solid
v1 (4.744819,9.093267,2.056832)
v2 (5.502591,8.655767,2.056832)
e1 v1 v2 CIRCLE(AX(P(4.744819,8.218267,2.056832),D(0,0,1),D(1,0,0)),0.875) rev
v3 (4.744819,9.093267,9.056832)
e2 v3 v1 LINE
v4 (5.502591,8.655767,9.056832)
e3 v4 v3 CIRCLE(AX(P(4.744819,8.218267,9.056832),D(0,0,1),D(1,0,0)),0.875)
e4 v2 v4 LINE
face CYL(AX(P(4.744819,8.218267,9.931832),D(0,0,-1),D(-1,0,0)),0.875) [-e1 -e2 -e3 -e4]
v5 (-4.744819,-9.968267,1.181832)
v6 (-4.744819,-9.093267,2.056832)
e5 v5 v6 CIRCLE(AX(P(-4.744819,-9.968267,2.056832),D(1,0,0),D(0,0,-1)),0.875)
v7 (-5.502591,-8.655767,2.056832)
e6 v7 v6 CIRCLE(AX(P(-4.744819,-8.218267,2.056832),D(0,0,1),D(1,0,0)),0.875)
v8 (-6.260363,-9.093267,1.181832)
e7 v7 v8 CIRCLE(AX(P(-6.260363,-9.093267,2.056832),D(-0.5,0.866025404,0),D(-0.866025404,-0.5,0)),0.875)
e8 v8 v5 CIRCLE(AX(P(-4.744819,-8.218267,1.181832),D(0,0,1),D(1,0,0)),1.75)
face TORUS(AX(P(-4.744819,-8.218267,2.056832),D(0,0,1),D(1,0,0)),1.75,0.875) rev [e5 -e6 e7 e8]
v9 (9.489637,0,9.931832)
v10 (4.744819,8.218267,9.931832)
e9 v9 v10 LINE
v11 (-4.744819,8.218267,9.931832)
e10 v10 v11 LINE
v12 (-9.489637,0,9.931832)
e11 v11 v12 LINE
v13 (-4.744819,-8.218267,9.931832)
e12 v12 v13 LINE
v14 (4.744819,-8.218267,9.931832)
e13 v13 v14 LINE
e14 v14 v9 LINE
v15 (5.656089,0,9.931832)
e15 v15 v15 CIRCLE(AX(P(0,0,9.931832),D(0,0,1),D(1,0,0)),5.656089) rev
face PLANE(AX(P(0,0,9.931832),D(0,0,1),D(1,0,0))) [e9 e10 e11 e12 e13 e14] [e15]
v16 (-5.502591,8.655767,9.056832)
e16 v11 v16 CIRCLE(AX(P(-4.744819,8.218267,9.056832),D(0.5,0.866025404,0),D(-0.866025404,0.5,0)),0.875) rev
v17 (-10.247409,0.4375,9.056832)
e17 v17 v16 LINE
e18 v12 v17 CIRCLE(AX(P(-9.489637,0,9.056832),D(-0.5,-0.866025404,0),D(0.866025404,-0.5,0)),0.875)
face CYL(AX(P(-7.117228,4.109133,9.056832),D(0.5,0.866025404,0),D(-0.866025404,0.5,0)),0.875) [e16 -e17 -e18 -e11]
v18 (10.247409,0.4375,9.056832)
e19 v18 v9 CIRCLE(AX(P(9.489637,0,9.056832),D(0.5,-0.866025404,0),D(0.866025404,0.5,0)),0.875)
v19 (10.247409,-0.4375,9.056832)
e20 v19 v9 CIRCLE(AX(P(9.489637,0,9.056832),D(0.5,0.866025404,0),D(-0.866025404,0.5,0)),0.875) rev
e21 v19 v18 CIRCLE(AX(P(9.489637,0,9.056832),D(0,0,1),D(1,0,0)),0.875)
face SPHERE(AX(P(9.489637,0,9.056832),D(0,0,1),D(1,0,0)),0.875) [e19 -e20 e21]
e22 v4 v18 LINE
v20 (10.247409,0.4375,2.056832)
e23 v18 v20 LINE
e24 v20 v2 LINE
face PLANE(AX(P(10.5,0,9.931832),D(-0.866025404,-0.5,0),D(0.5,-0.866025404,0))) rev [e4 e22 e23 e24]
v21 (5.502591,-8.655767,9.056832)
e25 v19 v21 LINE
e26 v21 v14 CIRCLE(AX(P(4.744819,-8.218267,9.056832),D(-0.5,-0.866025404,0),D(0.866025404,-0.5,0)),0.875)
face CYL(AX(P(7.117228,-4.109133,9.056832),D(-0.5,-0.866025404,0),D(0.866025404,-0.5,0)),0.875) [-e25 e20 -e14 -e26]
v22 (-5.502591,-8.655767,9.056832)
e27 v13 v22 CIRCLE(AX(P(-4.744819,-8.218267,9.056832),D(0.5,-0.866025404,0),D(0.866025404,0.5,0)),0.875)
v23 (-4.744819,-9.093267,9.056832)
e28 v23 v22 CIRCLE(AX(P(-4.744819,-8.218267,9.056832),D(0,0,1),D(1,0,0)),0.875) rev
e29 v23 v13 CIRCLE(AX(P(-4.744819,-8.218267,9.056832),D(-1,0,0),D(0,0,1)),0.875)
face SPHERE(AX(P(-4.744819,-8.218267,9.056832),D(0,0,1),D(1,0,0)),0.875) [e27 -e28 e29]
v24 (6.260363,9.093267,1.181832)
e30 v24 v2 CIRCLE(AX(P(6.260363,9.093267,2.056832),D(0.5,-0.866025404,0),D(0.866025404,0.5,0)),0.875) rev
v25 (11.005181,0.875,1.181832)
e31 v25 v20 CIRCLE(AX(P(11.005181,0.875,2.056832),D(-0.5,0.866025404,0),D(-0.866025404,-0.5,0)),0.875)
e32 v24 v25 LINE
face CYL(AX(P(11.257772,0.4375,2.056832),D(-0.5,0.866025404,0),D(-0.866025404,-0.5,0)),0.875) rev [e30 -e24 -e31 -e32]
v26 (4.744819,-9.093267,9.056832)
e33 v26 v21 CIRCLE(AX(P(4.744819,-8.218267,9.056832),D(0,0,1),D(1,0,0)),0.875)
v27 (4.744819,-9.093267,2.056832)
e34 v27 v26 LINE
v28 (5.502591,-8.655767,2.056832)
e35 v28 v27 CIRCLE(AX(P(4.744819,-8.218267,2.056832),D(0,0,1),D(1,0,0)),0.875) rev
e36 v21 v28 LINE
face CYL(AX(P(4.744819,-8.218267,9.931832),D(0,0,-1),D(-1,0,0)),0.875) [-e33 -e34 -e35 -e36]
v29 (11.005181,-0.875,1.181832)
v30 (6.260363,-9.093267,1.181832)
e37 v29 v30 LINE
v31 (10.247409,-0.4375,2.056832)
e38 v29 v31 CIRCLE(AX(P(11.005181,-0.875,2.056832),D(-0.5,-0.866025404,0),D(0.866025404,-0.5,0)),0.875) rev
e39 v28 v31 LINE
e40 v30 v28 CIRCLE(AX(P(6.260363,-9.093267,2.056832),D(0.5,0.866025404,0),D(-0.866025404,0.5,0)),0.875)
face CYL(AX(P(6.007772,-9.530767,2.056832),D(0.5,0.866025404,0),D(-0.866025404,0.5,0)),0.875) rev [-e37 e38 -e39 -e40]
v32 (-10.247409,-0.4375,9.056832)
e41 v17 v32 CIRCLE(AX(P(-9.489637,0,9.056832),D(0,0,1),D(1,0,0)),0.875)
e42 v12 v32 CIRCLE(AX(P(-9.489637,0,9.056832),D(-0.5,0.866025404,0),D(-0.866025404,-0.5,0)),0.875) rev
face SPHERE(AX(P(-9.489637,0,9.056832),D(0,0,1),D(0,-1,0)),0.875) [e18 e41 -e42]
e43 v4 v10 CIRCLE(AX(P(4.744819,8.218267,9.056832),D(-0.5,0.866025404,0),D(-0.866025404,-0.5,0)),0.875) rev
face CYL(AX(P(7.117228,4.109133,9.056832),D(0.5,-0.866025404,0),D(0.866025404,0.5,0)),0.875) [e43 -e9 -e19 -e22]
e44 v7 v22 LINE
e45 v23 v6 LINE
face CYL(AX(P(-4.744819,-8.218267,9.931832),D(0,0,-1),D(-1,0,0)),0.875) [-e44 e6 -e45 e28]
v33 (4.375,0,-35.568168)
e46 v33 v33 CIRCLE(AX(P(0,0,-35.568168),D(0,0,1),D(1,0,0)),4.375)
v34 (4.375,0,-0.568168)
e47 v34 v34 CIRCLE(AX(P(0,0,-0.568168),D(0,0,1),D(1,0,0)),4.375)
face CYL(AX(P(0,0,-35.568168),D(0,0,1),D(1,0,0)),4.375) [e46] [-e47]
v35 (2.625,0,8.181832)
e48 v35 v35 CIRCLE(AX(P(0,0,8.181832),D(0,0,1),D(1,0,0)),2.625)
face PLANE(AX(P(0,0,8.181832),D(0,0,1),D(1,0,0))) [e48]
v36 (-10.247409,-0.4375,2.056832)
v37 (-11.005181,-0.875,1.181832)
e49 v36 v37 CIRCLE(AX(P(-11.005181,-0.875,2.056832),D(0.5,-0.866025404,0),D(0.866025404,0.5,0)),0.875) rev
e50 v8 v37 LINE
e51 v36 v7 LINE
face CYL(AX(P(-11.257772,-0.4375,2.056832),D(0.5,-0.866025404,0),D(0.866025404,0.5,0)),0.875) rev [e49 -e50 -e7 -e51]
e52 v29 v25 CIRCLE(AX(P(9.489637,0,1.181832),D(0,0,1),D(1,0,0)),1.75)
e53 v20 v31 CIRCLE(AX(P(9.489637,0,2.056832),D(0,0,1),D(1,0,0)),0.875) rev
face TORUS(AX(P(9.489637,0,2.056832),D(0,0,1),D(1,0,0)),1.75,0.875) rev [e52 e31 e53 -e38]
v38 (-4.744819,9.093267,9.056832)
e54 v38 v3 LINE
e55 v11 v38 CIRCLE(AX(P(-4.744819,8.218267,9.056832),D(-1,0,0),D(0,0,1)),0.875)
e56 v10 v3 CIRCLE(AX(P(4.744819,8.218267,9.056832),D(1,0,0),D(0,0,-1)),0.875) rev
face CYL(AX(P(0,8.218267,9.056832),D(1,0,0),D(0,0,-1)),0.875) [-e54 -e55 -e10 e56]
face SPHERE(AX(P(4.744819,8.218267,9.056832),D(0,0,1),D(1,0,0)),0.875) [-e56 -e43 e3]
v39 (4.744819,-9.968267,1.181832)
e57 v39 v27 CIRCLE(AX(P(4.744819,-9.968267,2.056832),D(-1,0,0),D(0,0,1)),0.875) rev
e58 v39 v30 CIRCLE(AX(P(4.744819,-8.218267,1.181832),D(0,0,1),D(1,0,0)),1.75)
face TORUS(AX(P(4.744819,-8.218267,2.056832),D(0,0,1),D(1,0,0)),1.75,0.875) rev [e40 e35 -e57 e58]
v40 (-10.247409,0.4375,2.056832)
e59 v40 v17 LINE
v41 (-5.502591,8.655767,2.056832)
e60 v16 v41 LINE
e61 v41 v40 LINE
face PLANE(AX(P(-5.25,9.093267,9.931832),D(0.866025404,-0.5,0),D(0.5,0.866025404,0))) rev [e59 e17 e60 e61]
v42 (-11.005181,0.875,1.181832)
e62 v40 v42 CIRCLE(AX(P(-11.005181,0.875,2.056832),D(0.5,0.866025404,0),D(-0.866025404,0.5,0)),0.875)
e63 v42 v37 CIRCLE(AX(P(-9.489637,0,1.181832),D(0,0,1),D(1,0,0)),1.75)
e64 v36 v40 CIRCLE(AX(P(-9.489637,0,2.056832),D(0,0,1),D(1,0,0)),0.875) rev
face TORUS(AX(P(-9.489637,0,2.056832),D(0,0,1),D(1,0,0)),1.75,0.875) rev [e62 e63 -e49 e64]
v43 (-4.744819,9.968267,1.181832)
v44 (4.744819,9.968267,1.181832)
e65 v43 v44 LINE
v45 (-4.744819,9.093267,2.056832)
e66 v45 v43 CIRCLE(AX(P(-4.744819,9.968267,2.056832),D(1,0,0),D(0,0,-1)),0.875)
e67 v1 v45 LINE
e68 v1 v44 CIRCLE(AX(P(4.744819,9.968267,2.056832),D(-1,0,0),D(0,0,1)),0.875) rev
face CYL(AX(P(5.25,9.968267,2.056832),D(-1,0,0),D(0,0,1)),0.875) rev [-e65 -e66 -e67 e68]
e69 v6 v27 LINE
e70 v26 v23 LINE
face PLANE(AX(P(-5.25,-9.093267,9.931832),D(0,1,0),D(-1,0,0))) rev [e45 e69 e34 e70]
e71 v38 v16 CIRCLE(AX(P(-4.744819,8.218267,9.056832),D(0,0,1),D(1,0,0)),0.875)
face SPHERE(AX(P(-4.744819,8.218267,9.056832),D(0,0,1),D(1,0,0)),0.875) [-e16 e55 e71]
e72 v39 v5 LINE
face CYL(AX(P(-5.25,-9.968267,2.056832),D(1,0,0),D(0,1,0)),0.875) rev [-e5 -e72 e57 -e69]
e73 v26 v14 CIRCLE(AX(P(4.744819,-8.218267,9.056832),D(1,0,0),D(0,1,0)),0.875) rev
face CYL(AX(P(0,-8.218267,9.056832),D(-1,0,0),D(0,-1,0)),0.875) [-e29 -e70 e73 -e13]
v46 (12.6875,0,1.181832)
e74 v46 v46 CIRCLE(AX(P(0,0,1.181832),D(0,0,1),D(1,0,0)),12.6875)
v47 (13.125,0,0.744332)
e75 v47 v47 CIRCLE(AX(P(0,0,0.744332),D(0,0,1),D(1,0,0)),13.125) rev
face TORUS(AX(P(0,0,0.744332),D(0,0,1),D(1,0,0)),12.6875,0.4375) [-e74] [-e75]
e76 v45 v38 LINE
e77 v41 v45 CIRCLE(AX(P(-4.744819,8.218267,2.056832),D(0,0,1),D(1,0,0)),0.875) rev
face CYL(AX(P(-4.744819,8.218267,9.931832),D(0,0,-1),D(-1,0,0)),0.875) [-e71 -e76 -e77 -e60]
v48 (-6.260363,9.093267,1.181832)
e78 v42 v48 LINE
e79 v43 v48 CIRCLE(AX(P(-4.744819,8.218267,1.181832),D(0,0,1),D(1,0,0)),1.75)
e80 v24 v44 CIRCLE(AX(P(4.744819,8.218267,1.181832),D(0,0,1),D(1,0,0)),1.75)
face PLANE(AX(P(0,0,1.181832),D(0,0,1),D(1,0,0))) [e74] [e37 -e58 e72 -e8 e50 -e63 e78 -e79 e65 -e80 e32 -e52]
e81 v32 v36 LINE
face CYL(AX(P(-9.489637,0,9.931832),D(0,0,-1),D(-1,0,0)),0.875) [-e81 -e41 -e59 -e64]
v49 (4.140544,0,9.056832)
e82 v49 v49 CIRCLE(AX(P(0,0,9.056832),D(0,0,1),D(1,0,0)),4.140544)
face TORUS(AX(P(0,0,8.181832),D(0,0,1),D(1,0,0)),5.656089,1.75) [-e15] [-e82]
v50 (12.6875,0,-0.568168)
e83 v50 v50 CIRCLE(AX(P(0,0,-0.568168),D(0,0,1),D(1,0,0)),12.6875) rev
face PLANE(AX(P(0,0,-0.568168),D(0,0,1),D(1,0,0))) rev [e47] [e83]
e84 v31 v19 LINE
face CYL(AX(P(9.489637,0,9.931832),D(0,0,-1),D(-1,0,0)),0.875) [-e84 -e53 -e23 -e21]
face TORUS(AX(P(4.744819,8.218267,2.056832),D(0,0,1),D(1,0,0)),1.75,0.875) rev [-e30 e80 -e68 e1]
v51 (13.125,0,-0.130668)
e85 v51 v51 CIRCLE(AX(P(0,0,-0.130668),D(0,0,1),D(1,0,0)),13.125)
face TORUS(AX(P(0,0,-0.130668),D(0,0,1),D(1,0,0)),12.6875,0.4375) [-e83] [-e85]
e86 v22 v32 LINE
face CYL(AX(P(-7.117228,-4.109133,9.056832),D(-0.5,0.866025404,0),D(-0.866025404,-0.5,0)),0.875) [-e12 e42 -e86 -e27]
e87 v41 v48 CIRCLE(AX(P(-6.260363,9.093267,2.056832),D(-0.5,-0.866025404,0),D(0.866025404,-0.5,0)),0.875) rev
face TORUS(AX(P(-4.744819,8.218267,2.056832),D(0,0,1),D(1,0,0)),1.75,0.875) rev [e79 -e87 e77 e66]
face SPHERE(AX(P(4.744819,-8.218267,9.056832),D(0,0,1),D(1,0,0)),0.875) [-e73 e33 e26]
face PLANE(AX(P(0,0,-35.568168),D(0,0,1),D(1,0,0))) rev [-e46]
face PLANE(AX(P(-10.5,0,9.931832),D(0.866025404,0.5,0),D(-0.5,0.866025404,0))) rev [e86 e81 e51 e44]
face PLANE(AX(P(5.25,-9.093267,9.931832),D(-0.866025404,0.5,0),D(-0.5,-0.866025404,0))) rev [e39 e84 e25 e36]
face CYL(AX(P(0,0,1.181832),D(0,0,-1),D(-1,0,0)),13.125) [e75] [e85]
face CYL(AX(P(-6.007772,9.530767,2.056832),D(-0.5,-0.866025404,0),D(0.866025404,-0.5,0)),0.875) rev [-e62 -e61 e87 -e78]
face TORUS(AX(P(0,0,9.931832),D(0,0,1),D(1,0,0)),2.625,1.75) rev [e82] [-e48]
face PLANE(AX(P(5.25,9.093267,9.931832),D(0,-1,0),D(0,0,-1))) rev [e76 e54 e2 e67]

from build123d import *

# Parameters (mm, degrees)
SKETCH1_R           = 5
BOSS_EXTRUDE1_DEPTH = 40
SKETCH1_3_R         = 15
BOSS_EXTRUDE2_DEPTH = 2
BOSS_EXTRUDE3_DEPTH = 10
CUT_EXTRUDE1_START  = 10
SKETCH2_3_R         = 5
CUT_EXTRUDE1_DEPTH  = 2
FILLET1_R           = 0.5
FILLET2_R           = 1
FILLET3_R           = 2
FILLET4_R           = 2
SCALE1_SCALE        = 0.875


with BuildPart() as part:
    # Sketch1 → Boss-Extrude1 (new body)
    with BuildSketch(Plane(origin=(0, 0, 0), x_dir=(0, 1, 0), z_dir=(0, 0, 1))):
        with Locations(Location((0, 0, 0), (0, 0, 270))):
            Circle(SKETCH1_R)
    extrude(amount=-BOSS_EXTRUDE1_DEPTH)

    # Sketch1<3> → Boss-Extrude2 (add)
    with BuildSketch(Plane(origin=(0, 0, 0), x_dir=(0, 1, 0), z_dir=(0, 0, 1))):
        with Locations(Location((0, 0, 0), (0, 0, 270))):
            Circle(SKETCH1_3_R)
    extrude(amount=BOSS_EXTRUDE2_DEPTH)

    # Sketch2 → Boss-Extrude3 (add)
    with BuildSketch(Plane.XY.offset(2)):
        Polygon((-12, 0), (-6, -10.392304845), (6, -10.392304845), (12, 0), (6, 10.392304845), (-6, 10.392304845), align=None)
    extrude(amount=BOSS_EXTRUDE3_DEPTH)

    # Sketch2<3> → Cut-Extrude1 (cut)
    with BuildSketch(Plane.XY.offset(2).offset(CUT_EXTRUDE1_START)):
        Circle(SKETCH2_3_R)
    extrude(amount=-CUT_EXTRUDE1_DEPTH, mode=Mode.SUBTRACT)

    # Fillet1
    fillet1_edges = [part.edges().sort_by_distance(p)[0] for p in [
        (-15, 0, 0),
        (-15, 0, 2),
    ]]
    fillet(fillet1_edges, radius=FILLET1_R)

    # Fillet2
    fillet2_edges = [part.edges().sort_by_distance(p)[0] for p in [
        (0, -10.392304845, 2),
        (-6, -10.392304845, 7),
        (9, -5.196152423, 2),
        (6, -10.392304845, 7),
        (9, 5.196152423, 2),
        (12, 0, 7),
        (0, 10.392304845, 2),
        (6, 10.392304845, 7),
        (-9, 5.196152423, 2),
        (-6, 10.392304845, 7),
        (-9, -5.196152423, 2),
        (-12, 0, 7),
        (0, -10.392304845, 12),
        (9, -5.196152423, 12),
        (9, 5.196152423, 12),
        (0, 10.392304845, 12),
        (-9, 5.196152423, 12),
        (-9, -5.196152423, 12),
    ]]
    fillet(fillet2_edges, radius=FILLET2_R)

    # Fillet3
    fillet3_edges = [part.edges().sort_by_distance(p)[0] for p in [
        (-5, 0, 10),
    ]]
    fillet(fillet3_edges, radius=FILLET3_R - 0.0001)  # a hair under: the kernel refuses the full size

    # Fillet4
    fillet4_edges = [part.edges().sort_by_distance(p)[0] for p in [
        (-5, 0, 12),
    ]]
    fillet(fillet4_edges, radius=FILLET4_R)


with BuildPart() as part_1:
    # Scale1: scaled about (-9e-09, 0, -4.545352594)
    add(part.part.scale(SCALE1_SCALE).moved(Location((-1e-09, 0, -0.568169074))))


solid = part_1.part
